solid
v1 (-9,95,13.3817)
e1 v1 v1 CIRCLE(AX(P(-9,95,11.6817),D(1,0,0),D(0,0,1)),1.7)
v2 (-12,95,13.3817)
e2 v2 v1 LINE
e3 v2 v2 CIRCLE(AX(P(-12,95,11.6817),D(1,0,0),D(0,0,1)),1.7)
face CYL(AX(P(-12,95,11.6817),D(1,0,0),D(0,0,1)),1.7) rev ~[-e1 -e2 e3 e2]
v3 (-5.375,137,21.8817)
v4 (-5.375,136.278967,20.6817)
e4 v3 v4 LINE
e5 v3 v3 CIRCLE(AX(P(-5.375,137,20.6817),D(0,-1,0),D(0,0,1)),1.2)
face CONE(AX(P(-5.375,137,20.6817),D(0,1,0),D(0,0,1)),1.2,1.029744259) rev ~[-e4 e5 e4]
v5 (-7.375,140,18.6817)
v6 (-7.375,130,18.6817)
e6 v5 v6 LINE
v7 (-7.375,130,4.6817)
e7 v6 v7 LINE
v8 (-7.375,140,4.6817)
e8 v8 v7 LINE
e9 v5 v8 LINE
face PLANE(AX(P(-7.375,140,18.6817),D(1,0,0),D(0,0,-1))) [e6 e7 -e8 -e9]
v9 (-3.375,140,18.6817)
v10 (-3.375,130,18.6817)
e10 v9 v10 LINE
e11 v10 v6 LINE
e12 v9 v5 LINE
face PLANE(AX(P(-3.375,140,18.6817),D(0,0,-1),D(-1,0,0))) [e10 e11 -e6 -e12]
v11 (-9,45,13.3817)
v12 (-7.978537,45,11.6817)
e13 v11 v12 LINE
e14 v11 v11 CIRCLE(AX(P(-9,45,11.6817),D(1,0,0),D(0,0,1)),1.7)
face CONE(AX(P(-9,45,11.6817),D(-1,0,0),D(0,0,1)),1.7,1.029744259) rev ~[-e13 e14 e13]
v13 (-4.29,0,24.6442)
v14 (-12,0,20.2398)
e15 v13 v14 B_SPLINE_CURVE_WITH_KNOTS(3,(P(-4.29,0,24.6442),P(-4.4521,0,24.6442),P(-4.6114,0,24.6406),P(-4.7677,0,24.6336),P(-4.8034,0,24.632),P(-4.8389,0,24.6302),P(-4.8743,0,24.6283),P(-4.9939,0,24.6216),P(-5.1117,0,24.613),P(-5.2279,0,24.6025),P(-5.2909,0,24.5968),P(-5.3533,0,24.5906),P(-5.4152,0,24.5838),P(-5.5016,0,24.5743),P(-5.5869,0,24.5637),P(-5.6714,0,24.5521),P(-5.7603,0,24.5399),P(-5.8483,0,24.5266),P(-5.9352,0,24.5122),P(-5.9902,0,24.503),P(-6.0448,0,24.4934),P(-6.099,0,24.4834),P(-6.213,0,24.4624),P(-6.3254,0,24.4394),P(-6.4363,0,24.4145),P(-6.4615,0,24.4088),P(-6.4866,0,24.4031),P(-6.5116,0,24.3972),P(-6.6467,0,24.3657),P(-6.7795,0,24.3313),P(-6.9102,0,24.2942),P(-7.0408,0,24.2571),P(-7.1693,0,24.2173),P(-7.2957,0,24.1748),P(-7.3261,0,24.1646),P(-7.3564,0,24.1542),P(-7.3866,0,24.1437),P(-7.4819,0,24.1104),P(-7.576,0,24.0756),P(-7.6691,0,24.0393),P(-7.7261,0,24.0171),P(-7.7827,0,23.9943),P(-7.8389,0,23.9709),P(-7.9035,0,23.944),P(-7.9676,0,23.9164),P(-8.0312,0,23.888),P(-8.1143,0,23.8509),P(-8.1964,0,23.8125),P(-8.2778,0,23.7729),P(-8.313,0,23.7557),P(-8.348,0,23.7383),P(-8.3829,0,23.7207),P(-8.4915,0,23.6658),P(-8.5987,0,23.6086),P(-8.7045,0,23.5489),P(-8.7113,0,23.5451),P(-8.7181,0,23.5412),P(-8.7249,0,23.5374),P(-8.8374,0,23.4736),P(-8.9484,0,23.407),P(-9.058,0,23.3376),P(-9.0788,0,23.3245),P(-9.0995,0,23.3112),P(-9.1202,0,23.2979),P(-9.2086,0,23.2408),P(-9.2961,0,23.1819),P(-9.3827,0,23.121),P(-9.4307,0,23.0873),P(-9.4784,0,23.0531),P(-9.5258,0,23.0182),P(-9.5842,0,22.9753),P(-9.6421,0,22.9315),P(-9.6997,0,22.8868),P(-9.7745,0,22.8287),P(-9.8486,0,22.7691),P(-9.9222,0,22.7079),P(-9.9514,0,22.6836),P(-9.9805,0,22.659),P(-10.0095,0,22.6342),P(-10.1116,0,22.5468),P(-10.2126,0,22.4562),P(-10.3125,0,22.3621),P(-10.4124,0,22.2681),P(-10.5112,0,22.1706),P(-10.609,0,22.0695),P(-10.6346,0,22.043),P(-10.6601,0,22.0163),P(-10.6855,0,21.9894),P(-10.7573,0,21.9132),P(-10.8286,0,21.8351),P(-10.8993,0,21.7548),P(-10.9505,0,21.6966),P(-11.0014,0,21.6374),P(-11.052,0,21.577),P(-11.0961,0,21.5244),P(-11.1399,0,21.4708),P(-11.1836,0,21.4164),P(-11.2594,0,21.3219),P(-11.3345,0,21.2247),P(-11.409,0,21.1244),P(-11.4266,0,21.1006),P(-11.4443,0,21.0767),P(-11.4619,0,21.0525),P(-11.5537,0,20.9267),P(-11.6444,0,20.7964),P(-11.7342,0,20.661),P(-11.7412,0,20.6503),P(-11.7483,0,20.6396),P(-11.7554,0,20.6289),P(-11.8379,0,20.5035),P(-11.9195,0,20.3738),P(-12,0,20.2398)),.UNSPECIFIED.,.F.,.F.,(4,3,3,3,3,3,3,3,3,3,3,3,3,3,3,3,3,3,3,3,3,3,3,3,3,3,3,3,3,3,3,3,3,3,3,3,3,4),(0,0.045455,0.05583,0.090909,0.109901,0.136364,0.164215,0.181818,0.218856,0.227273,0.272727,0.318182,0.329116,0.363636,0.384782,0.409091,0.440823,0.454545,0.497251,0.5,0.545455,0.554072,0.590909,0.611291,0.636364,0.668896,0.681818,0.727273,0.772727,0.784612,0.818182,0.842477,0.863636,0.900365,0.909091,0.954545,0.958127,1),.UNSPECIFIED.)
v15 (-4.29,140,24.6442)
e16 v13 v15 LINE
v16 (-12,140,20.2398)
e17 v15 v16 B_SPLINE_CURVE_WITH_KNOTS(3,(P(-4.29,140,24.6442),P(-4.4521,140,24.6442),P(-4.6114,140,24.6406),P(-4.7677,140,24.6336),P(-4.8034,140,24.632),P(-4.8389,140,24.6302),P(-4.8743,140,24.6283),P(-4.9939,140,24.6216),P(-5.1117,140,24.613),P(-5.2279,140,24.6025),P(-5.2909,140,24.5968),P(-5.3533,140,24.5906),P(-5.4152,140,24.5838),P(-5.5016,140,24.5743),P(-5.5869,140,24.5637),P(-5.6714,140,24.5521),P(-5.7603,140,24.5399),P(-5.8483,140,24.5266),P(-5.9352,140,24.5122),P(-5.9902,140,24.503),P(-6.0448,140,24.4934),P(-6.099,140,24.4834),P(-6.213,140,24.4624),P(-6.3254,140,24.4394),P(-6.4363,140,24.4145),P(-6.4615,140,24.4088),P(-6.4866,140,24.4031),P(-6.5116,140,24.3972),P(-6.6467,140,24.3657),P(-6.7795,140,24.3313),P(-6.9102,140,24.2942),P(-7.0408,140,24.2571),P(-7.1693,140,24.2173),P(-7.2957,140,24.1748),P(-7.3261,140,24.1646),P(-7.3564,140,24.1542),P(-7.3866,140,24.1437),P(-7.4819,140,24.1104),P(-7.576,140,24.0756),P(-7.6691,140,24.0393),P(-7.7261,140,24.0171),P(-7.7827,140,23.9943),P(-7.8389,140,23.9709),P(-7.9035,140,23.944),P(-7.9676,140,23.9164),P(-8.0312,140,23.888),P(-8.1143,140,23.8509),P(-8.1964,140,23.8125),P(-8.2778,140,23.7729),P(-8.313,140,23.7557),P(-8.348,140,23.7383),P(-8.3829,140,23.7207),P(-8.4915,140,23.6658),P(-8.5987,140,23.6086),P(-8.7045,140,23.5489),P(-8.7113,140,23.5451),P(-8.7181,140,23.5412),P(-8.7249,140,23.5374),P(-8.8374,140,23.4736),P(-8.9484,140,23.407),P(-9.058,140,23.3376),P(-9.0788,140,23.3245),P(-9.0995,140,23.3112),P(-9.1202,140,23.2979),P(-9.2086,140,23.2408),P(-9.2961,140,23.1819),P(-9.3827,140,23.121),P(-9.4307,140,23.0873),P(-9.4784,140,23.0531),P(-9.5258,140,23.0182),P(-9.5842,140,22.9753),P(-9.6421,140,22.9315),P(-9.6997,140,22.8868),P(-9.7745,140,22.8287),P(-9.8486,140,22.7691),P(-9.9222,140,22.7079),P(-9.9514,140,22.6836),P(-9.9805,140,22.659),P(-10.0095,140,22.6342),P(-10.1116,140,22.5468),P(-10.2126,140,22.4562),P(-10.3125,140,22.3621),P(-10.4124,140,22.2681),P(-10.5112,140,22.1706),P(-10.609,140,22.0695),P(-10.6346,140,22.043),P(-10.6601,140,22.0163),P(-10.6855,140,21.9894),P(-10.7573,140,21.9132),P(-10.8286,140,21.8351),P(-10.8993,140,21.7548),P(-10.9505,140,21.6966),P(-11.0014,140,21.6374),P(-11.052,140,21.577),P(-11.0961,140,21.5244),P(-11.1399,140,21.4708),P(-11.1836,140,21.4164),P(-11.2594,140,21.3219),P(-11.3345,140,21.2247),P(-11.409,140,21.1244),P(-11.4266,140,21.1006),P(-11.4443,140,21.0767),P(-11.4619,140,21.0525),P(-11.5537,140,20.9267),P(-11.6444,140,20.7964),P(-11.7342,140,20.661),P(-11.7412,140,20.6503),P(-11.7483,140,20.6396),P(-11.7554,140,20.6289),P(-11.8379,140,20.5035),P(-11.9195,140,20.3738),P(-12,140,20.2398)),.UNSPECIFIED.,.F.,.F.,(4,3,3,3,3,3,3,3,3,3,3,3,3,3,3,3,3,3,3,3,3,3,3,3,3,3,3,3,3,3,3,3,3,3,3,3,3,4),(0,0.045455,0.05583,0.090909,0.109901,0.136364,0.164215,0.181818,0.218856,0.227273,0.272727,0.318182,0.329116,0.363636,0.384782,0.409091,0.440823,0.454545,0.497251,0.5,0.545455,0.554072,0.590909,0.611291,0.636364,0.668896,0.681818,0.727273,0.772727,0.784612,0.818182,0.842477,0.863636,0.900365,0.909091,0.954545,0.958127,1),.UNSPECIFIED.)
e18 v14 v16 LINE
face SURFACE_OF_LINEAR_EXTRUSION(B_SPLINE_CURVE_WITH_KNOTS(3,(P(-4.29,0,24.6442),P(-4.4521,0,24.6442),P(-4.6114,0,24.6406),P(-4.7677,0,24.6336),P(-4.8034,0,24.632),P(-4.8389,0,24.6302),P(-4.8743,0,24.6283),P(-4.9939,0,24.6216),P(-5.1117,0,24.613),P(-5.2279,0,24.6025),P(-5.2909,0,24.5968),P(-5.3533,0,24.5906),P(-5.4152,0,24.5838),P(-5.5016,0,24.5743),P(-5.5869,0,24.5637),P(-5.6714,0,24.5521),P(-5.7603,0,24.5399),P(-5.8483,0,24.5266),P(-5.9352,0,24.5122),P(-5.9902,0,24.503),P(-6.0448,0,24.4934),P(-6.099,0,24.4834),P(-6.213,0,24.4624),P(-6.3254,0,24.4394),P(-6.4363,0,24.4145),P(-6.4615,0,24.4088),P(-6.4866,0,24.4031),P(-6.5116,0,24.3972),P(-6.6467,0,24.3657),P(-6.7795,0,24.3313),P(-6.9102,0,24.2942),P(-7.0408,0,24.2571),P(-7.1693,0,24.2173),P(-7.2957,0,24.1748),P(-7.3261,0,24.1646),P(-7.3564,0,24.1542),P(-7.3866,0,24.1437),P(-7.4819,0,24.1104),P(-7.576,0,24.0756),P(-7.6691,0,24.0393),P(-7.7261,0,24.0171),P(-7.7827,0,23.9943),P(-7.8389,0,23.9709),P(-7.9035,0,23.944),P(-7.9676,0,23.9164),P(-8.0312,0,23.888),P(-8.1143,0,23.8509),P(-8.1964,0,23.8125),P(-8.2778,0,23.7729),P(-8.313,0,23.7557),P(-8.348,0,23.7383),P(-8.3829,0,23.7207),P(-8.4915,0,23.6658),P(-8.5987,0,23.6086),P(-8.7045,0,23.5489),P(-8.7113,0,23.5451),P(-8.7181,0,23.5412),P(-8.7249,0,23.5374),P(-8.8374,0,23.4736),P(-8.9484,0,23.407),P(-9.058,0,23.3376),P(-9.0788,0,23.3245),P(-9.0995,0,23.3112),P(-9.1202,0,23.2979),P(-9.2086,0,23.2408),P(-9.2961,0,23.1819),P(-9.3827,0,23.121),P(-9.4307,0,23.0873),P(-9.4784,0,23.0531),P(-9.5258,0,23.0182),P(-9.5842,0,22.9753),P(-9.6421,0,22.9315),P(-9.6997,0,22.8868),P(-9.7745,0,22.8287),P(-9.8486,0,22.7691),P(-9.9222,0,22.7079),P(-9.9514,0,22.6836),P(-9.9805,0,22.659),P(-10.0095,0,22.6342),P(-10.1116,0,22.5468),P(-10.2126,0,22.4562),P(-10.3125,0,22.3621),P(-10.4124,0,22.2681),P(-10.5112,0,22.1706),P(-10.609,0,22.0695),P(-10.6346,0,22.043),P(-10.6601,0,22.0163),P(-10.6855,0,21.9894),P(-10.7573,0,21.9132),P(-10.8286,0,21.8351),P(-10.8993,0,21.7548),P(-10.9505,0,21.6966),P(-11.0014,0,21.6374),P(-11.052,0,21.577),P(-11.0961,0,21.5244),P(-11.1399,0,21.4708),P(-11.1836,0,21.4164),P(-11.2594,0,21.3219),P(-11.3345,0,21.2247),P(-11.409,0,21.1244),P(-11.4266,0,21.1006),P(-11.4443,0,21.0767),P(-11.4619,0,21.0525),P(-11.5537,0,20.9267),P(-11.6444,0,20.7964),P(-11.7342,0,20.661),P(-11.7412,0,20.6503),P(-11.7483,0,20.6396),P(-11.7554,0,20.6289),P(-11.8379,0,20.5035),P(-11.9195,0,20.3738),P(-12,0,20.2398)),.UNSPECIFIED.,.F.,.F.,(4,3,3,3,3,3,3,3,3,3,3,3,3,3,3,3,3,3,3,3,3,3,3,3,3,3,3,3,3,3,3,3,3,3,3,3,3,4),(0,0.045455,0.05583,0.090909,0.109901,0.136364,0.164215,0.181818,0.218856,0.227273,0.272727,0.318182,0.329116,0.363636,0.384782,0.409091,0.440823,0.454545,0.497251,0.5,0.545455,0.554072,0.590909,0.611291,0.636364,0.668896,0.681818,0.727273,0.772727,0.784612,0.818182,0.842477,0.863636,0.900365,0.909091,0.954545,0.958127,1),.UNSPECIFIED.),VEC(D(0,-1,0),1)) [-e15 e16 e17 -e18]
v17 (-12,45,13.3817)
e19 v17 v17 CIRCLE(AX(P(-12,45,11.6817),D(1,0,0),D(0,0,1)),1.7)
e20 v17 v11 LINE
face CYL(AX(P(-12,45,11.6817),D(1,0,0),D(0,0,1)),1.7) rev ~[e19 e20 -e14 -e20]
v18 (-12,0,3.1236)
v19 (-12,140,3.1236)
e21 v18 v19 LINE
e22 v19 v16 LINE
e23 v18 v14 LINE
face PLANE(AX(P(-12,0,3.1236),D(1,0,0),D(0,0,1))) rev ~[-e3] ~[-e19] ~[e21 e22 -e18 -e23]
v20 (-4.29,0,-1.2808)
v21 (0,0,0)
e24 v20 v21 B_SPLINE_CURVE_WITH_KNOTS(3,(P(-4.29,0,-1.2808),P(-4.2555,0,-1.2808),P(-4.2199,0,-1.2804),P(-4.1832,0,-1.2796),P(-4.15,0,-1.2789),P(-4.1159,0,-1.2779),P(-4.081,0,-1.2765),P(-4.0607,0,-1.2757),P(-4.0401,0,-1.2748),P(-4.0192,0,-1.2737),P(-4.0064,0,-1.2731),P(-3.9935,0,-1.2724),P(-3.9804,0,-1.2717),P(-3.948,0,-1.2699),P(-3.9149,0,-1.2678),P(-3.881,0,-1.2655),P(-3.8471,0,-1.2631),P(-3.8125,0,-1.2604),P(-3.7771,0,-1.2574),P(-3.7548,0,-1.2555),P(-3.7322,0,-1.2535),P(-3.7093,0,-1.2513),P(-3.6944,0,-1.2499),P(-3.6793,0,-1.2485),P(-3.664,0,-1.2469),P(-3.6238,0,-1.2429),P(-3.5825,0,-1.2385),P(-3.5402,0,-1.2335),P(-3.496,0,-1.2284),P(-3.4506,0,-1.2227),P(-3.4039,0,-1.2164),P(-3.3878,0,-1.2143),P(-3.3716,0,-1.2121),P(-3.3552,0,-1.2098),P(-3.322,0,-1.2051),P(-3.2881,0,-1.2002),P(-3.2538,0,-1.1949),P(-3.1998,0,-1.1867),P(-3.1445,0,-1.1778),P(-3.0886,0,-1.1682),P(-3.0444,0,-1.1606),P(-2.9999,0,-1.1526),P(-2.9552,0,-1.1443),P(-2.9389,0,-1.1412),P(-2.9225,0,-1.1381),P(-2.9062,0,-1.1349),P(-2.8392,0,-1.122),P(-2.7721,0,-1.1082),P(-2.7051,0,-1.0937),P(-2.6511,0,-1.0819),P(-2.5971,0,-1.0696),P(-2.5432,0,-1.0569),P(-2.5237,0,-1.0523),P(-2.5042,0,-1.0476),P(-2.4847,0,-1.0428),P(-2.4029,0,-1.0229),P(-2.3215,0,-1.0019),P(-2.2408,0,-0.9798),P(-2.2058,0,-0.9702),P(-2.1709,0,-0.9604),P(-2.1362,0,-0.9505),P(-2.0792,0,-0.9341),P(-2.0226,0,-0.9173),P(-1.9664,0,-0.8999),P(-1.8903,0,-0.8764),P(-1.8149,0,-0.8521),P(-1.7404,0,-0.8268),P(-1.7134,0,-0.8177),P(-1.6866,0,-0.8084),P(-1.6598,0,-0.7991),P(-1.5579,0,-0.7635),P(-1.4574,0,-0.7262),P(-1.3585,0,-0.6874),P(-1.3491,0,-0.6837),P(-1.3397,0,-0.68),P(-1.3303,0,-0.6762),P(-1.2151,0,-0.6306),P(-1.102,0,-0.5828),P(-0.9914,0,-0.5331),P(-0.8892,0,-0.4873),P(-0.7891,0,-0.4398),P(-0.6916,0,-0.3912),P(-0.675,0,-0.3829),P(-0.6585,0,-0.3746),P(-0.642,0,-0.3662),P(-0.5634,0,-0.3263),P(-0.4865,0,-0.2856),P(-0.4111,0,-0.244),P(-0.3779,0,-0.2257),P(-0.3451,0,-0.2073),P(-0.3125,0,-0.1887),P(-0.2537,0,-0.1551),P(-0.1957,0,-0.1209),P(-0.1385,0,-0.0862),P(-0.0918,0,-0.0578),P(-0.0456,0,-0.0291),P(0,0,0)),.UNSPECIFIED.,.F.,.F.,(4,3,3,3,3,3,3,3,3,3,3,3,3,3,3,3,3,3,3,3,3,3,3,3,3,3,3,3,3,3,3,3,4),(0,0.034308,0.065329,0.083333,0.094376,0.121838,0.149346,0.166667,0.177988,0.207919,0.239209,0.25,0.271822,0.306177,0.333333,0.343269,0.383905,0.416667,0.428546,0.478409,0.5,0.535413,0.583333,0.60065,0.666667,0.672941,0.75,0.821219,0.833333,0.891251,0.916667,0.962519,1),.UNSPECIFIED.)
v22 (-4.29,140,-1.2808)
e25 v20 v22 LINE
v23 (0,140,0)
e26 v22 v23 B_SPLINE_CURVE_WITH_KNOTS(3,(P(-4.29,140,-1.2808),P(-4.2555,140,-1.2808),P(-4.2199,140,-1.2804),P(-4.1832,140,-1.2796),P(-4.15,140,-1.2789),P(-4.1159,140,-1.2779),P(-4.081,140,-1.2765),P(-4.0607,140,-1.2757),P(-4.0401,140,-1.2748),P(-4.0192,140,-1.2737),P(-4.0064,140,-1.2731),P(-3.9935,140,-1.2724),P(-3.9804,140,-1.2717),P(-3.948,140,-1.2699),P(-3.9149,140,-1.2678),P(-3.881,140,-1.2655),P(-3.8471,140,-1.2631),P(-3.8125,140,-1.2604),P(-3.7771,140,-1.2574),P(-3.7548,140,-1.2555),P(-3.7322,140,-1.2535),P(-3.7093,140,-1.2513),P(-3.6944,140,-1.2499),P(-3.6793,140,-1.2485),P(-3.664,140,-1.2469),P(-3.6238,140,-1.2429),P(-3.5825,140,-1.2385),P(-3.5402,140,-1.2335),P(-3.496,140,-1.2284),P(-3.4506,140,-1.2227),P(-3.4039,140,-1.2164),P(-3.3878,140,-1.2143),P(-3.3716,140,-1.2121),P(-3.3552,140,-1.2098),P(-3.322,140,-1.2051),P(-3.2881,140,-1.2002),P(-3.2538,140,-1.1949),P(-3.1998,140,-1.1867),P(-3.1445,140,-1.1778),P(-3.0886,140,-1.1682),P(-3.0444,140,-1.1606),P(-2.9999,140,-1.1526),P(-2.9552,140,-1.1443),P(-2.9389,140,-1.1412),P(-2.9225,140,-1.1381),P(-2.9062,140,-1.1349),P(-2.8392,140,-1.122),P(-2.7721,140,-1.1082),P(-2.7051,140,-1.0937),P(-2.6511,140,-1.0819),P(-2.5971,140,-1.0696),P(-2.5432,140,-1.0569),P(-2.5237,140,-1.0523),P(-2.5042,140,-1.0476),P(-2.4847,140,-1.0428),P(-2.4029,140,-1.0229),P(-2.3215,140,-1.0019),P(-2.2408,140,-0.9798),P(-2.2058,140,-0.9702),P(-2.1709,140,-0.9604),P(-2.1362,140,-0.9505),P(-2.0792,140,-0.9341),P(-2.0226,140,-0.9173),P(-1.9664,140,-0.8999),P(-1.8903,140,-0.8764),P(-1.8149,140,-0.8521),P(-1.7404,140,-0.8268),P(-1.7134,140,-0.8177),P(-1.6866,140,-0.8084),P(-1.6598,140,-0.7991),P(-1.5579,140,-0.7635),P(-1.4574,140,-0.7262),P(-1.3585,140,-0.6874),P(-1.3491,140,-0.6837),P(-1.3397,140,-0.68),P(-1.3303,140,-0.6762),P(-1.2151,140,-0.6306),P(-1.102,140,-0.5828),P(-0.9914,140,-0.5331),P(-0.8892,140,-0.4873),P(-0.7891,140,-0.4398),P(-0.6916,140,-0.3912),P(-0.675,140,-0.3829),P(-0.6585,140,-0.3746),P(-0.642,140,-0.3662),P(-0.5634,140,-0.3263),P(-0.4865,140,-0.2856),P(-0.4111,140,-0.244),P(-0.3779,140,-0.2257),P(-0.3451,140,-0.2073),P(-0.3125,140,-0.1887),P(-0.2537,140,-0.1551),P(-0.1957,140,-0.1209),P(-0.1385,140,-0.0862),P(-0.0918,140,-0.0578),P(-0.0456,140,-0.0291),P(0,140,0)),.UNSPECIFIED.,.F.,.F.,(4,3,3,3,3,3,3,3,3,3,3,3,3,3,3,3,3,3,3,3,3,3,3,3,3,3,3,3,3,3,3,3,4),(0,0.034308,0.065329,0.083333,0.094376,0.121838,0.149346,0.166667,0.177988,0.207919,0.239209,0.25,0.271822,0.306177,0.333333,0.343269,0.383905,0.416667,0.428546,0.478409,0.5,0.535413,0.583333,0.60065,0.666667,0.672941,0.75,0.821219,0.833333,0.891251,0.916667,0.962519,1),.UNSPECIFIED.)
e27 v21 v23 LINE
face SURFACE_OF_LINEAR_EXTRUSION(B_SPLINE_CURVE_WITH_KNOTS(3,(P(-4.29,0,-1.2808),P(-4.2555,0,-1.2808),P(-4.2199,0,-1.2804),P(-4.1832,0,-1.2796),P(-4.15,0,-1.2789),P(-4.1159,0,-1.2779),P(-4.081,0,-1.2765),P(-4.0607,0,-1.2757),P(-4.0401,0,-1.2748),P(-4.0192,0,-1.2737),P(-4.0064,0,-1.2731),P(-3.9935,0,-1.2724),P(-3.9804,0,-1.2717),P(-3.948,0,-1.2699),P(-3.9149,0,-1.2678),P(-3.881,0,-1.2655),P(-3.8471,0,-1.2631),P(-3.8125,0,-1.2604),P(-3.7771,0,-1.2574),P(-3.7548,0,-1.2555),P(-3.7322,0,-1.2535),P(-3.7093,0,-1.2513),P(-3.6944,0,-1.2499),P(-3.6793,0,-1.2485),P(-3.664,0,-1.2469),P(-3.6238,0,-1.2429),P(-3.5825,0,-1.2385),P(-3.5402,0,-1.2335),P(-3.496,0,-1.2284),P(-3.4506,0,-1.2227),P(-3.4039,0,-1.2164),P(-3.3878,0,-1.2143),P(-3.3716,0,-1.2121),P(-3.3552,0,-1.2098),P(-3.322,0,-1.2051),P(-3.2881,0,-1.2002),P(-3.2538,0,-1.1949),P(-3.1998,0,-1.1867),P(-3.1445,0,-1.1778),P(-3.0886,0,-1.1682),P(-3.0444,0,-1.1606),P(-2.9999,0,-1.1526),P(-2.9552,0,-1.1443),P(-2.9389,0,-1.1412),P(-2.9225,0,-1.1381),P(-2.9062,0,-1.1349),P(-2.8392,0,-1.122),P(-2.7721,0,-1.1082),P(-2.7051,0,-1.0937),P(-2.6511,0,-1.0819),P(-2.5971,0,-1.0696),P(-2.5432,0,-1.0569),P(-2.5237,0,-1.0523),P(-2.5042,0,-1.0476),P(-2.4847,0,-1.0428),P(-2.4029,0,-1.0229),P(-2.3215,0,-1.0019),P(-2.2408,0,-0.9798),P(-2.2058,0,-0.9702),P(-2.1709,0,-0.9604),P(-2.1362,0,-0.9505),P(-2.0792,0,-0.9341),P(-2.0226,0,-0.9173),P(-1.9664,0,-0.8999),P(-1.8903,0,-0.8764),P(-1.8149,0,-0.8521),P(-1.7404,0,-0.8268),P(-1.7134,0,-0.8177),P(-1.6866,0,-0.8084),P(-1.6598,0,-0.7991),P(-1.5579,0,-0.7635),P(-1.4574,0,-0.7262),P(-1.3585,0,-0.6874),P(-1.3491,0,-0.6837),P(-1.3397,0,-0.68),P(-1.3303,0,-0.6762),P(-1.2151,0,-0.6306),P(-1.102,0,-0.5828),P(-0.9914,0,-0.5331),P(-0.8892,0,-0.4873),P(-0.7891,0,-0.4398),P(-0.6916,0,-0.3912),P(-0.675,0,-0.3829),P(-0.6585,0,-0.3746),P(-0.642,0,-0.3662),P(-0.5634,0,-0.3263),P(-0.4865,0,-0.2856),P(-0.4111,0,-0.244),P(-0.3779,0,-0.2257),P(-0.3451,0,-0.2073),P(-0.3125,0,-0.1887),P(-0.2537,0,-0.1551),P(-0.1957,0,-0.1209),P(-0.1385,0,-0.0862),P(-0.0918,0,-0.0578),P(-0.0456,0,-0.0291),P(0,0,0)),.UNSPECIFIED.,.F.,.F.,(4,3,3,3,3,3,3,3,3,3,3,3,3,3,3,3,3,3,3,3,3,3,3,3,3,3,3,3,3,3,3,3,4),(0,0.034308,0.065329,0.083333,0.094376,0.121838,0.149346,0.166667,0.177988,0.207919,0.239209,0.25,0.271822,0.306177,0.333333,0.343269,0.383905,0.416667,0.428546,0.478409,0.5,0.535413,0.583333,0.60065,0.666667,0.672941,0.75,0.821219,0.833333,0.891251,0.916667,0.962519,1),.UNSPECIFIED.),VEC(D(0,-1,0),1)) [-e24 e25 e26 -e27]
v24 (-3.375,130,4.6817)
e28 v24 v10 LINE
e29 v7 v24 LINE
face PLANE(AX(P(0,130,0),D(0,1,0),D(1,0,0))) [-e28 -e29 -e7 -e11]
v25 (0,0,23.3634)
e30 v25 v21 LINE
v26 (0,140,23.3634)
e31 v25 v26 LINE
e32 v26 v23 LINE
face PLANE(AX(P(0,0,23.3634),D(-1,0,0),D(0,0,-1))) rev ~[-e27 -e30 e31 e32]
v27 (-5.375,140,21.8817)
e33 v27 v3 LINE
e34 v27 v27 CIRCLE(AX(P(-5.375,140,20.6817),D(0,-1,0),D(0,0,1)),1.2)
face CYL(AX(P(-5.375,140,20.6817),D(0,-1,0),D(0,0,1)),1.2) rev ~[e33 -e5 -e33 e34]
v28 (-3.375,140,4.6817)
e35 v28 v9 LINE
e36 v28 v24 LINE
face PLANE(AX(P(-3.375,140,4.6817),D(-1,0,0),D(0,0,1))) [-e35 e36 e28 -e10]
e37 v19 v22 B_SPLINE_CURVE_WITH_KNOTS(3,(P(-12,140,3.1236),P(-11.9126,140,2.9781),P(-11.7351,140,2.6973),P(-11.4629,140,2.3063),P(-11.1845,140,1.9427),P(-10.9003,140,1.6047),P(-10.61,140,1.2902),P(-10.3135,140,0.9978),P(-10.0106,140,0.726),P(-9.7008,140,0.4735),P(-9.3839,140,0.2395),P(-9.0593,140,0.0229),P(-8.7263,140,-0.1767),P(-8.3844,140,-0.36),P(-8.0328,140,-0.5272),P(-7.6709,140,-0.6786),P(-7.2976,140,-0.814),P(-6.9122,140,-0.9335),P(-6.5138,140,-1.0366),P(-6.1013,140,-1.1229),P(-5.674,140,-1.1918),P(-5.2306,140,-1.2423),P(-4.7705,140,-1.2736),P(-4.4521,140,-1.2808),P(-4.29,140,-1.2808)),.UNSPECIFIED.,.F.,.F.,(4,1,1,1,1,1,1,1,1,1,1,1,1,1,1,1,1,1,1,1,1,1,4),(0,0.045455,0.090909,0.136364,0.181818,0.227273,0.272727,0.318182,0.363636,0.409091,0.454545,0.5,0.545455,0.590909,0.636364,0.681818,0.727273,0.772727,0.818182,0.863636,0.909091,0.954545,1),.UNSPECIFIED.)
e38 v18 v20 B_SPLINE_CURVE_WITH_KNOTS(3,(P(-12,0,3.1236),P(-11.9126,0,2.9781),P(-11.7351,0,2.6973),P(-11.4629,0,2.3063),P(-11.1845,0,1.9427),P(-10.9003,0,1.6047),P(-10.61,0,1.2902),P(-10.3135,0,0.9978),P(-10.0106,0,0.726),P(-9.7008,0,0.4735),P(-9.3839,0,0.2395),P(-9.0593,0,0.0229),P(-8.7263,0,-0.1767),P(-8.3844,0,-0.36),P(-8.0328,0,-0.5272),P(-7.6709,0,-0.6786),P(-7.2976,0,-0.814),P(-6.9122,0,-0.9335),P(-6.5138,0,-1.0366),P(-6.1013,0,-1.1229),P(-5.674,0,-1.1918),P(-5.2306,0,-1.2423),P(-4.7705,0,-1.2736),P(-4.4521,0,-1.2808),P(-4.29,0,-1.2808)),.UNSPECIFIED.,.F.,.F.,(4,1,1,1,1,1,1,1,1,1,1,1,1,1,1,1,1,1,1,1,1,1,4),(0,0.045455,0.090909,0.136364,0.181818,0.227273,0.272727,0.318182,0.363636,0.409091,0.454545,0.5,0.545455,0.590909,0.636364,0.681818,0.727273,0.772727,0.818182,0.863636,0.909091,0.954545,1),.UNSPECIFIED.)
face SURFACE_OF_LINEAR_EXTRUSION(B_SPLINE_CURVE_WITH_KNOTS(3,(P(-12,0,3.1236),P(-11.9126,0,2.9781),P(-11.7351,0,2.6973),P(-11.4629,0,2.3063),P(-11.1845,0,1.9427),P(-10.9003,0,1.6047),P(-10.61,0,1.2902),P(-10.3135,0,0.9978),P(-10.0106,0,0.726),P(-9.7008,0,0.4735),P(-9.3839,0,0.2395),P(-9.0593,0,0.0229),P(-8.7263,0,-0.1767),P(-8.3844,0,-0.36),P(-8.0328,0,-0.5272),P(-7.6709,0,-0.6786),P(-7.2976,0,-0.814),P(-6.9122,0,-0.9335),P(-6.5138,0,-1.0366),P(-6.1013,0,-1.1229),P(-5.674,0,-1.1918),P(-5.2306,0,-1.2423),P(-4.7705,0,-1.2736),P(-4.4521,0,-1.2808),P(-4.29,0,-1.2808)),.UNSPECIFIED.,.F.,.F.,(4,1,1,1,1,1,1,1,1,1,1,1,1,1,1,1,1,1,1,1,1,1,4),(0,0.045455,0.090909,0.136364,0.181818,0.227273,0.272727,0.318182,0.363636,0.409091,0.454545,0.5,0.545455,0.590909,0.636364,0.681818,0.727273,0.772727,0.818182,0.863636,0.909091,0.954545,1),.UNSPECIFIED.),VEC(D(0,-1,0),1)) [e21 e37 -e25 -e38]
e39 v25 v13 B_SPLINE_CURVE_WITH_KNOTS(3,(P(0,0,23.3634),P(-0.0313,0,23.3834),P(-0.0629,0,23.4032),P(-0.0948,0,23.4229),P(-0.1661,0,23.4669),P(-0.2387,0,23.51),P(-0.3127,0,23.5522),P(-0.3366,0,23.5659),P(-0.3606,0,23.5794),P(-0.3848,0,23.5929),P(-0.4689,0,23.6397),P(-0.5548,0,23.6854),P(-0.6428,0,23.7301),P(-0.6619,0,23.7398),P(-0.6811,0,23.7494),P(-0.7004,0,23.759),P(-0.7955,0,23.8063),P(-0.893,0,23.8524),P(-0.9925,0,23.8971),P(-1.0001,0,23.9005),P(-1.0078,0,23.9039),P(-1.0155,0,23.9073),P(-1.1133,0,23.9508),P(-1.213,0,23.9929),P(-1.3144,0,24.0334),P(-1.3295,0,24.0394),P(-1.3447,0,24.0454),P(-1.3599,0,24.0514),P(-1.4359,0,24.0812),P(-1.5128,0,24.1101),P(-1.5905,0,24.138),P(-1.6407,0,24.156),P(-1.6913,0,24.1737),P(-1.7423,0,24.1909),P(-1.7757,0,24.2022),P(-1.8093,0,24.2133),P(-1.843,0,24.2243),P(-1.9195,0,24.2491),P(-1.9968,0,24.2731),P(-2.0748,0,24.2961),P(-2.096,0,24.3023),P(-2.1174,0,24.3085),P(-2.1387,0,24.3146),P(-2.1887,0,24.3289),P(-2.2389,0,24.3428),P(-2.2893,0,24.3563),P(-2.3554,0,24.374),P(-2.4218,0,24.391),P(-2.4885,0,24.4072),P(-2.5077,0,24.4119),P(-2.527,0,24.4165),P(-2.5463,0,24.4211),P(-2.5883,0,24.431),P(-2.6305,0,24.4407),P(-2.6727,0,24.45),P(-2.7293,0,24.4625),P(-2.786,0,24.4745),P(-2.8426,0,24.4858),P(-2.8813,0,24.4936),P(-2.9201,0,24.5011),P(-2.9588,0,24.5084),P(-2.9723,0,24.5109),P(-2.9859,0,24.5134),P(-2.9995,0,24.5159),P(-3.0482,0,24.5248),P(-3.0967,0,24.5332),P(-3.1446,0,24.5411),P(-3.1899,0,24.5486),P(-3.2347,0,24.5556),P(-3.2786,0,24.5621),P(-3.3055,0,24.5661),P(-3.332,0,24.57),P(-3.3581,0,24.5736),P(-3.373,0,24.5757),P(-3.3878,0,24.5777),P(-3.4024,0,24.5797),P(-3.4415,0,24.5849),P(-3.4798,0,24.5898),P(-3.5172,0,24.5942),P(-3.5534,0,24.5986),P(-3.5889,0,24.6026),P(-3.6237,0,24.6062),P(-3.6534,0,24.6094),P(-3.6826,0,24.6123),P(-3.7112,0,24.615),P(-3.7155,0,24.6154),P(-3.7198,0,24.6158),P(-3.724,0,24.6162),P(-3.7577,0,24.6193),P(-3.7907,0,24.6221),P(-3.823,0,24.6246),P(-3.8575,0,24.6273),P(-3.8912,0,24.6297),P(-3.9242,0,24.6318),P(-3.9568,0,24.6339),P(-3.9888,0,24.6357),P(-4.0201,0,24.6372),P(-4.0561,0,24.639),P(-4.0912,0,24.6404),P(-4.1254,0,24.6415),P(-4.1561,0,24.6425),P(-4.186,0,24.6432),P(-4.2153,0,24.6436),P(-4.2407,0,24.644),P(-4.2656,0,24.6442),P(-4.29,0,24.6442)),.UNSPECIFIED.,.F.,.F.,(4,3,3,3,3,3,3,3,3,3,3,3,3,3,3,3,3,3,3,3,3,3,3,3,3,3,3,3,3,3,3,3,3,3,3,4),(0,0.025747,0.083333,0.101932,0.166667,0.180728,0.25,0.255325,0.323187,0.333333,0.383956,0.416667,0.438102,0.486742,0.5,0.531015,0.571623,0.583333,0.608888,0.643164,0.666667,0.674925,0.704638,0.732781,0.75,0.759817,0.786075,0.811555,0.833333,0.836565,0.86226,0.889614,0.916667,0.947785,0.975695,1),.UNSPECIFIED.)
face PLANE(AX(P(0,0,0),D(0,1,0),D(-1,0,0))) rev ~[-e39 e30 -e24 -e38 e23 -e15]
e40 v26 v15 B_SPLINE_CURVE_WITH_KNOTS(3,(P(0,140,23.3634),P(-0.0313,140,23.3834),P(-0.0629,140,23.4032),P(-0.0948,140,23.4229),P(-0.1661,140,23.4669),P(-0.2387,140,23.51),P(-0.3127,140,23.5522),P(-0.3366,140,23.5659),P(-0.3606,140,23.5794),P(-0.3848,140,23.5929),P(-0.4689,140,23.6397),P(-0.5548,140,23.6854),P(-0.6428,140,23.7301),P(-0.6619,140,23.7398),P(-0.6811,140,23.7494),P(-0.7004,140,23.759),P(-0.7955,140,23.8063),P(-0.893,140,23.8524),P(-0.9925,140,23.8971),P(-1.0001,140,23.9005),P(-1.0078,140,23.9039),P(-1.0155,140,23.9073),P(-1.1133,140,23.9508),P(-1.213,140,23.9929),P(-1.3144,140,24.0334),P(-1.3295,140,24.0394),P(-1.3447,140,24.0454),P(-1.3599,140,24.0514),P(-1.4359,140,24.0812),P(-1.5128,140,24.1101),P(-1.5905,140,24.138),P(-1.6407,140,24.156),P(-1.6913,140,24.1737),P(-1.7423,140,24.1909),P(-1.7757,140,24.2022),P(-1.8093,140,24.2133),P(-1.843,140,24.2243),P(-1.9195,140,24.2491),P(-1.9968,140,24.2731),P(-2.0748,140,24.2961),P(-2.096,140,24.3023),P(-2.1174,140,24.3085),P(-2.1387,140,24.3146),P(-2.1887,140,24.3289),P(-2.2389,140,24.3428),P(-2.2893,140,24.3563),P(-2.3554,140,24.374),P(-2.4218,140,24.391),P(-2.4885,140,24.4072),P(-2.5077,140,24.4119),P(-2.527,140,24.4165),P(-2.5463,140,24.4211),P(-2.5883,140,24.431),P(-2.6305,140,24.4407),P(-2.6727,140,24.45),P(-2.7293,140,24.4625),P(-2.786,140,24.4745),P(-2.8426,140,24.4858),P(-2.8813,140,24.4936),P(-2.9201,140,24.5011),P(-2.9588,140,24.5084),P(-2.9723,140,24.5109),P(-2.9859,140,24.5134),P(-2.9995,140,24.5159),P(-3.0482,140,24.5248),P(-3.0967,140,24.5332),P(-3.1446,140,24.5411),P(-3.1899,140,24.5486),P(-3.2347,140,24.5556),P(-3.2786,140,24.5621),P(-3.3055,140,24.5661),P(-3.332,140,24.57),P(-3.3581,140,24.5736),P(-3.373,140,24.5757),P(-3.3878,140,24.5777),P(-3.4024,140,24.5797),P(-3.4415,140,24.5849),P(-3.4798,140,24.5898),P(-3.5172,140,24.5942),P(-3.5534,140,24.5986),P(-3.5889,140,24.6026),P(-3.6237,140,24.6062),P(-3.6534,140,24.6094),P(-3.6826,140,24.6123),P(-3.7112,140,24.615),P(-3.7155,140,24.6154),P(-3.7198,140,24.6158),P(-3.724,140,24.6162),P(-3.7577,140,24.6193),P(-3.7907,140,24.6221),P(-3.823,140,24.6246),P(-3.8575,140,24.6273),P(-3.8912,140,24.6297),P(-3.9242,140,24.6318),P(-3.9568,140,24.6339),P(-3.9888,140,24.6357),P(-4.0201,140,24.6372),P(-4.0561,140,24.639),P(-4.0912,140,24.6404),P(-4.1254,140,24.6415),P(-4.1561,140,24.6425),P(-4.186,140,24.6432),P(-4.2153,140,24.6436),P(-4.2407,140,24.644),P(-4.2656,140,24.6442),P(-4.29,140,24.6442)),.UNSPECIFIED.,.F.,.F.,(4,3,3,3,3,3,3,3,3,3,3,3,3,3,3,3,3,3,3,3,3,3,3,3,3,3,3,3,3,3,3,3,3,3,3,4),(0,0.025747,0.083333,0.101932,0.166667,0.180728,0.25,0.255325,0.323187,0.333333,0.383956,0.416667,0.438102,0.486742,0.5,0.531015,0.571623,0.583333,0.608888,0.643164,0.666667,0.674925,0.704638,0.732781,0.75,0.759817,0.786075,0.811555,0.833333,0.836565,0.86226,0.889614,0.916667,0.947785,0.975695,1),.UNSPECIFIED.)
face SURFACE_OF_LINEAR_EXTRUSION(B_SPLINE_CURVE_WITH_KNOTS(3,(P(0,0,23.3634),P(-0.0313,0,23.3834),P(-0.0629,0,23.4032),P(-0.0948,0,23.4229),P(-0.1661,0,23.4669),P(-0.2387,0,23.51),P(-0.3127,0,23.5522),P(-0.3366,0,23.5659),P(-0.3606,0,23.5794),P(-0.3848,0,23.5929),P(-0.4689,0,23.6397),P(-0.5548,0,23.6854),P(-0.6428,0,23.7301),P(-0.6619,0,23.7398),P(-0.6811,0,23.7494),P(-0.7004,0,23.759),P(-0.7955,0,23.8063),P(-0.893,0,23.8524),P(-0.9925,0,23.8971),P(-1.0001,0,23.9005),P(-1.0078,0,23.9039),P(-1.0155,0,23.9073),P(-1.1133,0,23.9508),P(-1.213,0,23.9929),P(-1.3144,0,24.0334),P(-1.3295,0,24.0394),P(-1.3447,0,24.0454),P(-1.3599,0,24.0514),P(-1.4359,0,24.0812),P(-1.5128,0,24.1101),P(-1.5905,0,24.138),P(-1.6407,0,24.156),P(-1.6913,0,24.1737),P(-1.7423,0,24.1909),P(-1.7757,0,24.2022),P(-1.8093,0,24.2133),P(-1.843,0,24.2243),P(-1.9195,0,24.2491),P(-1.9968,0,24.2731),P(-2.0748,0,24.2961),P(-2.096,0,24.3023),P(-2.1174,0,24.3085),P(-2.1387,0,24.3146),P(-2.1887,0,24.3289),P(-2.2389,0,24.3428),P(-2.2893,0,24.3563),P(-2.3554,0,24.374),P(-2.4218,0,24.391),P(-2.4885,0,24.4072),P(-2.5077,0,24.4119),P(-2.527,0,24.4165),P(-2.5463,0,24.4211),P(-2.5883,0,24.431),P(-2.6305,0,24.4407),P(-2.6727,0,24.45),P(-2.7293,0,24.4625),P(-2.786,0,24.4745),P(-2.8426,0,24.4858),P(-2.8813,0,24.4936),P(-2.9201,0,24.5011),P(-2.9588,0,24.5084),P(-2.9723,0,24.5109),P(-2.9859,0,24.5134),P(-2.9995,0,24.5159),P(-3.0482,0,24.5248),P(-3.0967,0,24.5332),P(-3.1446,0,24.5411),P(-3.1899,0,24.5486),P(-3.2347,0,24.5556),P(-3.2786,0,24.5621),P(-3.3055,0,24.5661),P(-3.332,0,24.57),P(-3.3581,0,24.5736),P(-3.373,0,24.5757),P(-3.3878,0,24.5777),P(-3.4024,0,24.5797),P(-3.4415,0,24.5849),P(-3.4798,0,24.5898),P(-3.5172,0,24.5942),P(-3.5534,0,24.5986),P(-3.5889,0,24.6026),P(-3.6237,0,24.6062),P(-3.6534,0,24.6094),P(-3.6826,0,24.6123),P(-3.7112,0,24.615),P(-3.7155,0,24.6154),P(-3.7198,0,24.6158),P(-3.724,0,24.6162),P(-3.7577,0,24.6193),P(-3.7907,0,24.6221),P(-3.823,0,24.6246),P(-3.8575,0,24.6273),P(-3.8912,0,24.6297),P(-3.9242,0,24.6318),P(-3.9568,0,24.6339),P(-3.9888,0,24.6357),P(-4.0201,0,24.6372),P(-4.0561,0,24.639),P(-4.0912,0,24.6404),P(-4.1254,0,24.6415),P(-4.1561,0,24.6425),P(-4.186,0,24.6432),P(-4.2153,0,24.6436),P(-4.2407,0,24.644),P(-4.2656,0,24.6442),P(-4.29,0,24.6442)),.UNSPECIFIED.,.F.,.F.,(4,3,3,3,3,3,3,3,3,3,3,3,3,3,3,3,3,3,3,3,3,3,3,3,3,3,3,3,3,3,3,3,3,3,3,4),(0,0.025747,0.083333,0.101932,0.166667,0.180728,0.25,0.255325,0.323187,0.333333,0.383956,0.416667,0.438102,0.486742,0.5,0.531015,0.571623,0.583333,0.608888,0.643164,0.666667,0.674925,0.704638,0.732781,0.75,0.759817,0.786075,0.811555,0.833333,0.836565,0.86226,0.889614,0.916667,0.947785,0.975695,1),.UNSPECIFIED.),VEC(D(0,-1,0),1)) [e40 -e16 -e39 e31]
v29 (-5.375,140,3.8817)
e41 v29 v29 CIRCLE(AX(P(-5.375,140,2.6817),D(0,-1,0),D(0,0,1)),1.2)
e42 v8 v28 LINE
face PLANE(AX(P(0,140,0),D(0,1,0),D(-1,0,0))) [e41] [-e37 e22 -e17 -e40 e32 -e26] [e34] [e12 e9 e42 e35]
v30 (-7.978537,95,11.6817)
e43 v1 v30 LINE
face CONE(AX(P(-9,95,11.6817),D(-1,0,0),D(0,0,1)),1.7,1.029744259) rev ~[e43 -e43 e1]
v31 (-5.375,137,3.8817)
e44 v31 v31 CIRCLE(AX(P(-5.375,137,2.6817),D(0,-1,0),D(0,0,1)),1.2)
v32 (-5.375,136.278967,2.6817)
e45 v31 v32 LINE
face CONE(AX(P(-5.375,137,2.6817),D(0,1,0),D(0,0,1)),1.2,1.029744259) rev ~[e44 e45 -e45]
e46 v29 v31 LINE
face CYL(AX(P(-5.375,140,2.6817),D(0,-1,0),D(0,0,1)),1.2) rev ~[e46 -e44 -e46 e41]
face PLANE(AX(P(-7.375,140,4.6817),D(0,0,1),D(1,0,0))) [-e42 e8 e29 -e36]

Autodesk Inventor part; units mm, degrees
ref_plane "YZ Plane" through (0, 0, 0) normal (1, 0, 0) x (0, 1, 0)
ref_plane "XZ Plane" through (0, 0, 0) normal (0, 1, 0) x (-1, 0, 0)
ref_plane "XY Plane" through (0, 0, 0) normal (0, 0, 1) x (1, 0, 0)
sketch "Szkic1" plane through (0, 0, 0) normal (0, 1, 0) x (-1, 0, 0)
  spline S0 degree 3 poles (4.29, 24.6442) (4.4521, 24.6442) (4.6114, 24.6406) (4.7677, 24.6336) (4.8034, 24.632) (4.8389, 24.6302) (4.8743, 24.6283) (4.9939, 24.6216) (5.1117, 24.613) (5.2279, 24.6025) (5.2909, 24.5968) (5.3533, 24.5906) (5.4152, 24.5838) (5.5016, 24.5743) (5.5869, 24.5637) (5.6714, 24.5521) (5.7603, 24.5399) (5.8483, 24.5266) (5.9352, 24.5122) (5.9902, 24.503) (6.0448, 24.4934) (6.099, 24.4834) (6.213, 24.4624) (6.3254, 24.4394) (6.4363, 24.4145) (6.4615, 24.4088) (6.4866, 24.4031) (6.5116, 24.3972) (6.6467, 24.3657) (6.7795, 24.3313) (6.9102, 24.2942) (7.0408, 24.2571) (7.1693, 24.2173) (7.2957, 24.1748) (7.3261, 24.1646) (7.3564, 24.1542) (7.3866, 24.1437) (7.4819, 24.1104) (7.576, 24.0756) (7.6691, 24.0393) (7.7261, 24.0171) (7.7827, 23.9943) (7.8389, 23.9709) (7.9035, 23.944) (7.9676, 23.9164) (8.0312, 23.888) (8.1143, 23.8509) (8.1964, 23.8125) (8.2778, 23.7729) (8.313, 23.7557) (8.348, 23.7383) (8.3829, 23.7207) (8.4915, 23.6658) (8.5987, 23.6086) (8.7045, 23.5489) (8.7113, 23.5451) (8.7181, 23.5412) (8.7249, 23.5374) (8.8374, 23.4736) (8.9484, 23.407) (9.058, 23.3376) (9.0788, 23.3245) (9.0995, 23.3112) (9.1202, 23.2979) (9.2086, 23.2408) (9.2961, 23.1819) (9.3827, 23.121) (9.4307, 23.0873) (9.4784, 23.0531) (9.5258, 23.0182) (9.5842, 22.9753) (9.6421, 22.9315) (9.6997, 22.8868) (9.7745, 22.8287) (9.8486, 22.7691) (9.9222, 22.7079) (9.9514, 22.6836) (9.9805, 22.659) (10.0095, 22.6342) (10.1116, 22.5468) (10.2126, 22.4562) (10.3125, 22.3621) (10.4124, 22.2681) (10.5112, 22.1706) (10.609, 22.0695) (10.6346, 22.043) (10.6601, 22.0163) (10.6855, 21.9894) (10.7573, 21.9132) (10.8286, 21.8351) (10.8993, 21.7548) (10.9505, 21.6966) (11.0014, 21.6374) (11.052, 21.577) (11.0961, 21.5244) (11.1399, 21.4708) (11.1836, 21.4164) (11.2594, 21.3219) (11.3345, 21.2247) (11.409, 21.1244) (11.4266, 21.1006) (11.4443, 21.0767) (11.4619, 21.0525) (11.5537, 20.9267) (11.6444, 20.7964) (11.7342, 20.661) (11.7412, 20.6503) (11.7483, 20.6396) (11.7554, 20.6289) (11.8379, 20.5035) (11.9195, 20.3738) (12, 20.2398) knots 0 0 0 0 0.045455 0.045455 0.045455 0.05583 0.05583 0.05583 0.090909 0.090909 0.090909 0.109901 0.109901 0.109901 0.136364 0.136364 0.136364 0.164215 0.164215 0.164215 0.181818 0.181818 0.181818 0.218856 0.218856 0.218856 0.227273 0.227273 0.227273 0.272727 0.272727 0.272727 0.318182 0.318182 0.318182 0.329116 0.329116 0.329116 0.363636 0.363636 0.363636 0.384782 0.384782 0.384782 0.409091 0.409091 0.409091 0.440823 0.440823 0.440823 0.454545 0.454545 0.454545 0.497251 0.497251 0.497251 0.5 0.5 0.5 0.545455 0.545455 0.545455 0.554072 0.554072 0.554072 0.590909 0.590909 0.590909 0.611291 0.611291 0.611291 0.636364 0.636364 0.636364 0.668896 0.668896 0.668896 0.681818 0.681818 0.681818 0.727273 0.727273 0.727273 0.772727 0.772727 0.772727 0.784612 0.784612 0.784612 0.818182 0.818182 0.818182 0.842477 0.842477 0.842477 0.863636 0.863636 0.863636 0.900365 0.900365 0.900365 0.909091 0.909091 0.909091 0.954545 0.954545 0.954545 0.958127 0.958127 0.958127 1 1 1 1
  spline S1 degree 3 poles (0, 23.3634) (0.0313, 23.3834) (0.0629, 23.4032) (0.0948, 23.4229) (0.1661, 23.4669) (0.2387, 23.51) (0.3127, 23.5522) (0.3366, 23.5659) (0.3606, 23.5794) (0.3848, 23.5929) (0.4689, 23.6397) (0.5548, 23.6854) (0.6428, 23.7301) (0.6619, 23.7398) (0.6811, 23.7494) (0.7004, 23.759) (0.7955, 23.8063) (0.893, 23.8524) (0.9925, 23.8971) (1.0001, 23.9005) (1.0078, 23.9039) (1.0155, 23.9073) (1.1133, 23.9508) (1.213, 23.9929) (1.3144, 24.0334) (1.3295, 24.0394) (1.3447, 24.0454) (1.3599, 24.0514) (1.4359, 24.0812) (1.5128, 24.1101) (1.5905, 24.138) (1.6407, 24.156) (1.6913, 24.1737) (1.7423, 24.1909) (1.7757, 24.2022) (1.8093, 24.2133) (1.843, 24.2243) (1.9195, 24.2491) (1.9968, 24.2731) (2.0748, 24.2961) (2.096, 24.3023) (2.1174, 24.3085) (2.1387, 24.3146) (2.1887, 24.3289) (2.2389, 24.3428) (2.2893, 24.3563) (2.3554, 24.374) (2.4218, 24.391) (2.4885, 24.4072) (2.5077, 24.4119) (2.527, 24.4165) (2.5463, 24.4211) (2.5883, 24.431) (2.6305, 24.4407) (2.6727, 24.45) (2.7293, 24.4625) (2.786, 24.4745) (2.8426, 24.4858) (2.8813, 24.4936) (2.9201, 24.5011) (2.9588, 24.5084) (2.9723, 24.5109) (2.9859, 24.5134) (2.9995, 24.5159) (3.0482, 24.5248) (3.0967, 24.5332) (3.1446, 24.5411) (3.1899, 24.5486) (3.2347, 24.5556) (3.2786, 24.5621) (3.3055, 24.5661) (3.332, 24.57) (3.3581, 24.5736) (3.373, 24.5757) (3.3878, 24.5777) (3.4024, 24.5797) (3.4415, 24.5849) (3.4798, 24.5898) (3.5172, 24.5942) (3.5534, 24.5986) (3.5889, 24.6026) (3.6237, 24.6062) (3.6534, 24.6094) (3.6826, 24.6123) (3.7112, 24.615) (3.7155, 24.6154) (3.7198, 24.6158) (3.724, 24.6162) (3.7577, 24.6193) (3.7907, 24.6221) (3.823, 24.6246) (3.8575, 24.6273) (3.8912, 24.6297) (3.9242, 24.6318) (3.9568, 24.6339) (3.9888, 24.6357) (4.0201, 24.6372) (4.0561, 24.639) (4.0912, 24.6404) (4.1254, 24.6415) (4.1561, 24.6425) (4.186, 24.6432) (4.2153, 24.6436) (4.2407, 24.644) (4.2656, 24.6442) (4.29, 24.6442) knots 0 0 0 0 0.025747 0.025747 0.025747 0.083333 0.083333 0.083333 0.101932 0.101932 0.101932 0.166667 0.166667 0.166667 0.180728 0.180728 0.180728 0.25 0.25 0.25 0.255325 0.255325 0.255325 0.323187 0.323187 0.323187 0.333333 0.333333 0.333333 0.383956 0.383956 0.383956 0.416667 0.416667 0.416667 0.438102 0.438102 0.438102 0.486742 0.486742 0.486742 0.5 0.5 0.5 0.531015 0.531015 0.531015 0.571623 0.571623 0.571623 0.583333 0.583333 0.583333 0.608888 0.608888 0.608888 0.643164 0.643164 0.643164 0.666667 0.666667 0.666667 0.674925 0.674925 0.674925 0.704638 0.704638 0.704638 0.732781 0.732781 0.732781 0.75 0.75 0.75 0.759817 0.759817 0.759817 0.786075 0.786075 0.786075 0.811555 0.811555 0.811555 0.833333 0.833333 0.833333 0.836565 0.836565 0.836565 0.86226 0.86226 0.86226 0.889614 0.889614 0.889614 0.916667 0.916667 0.916667 0.947785 0.947785 0.947785 0.975695 0.975695 0.975695 1 1 1 1
  line L0 (0, 23.3634) -> (0, 0)
  spline S2 degree 3 poles (4.29, -1.2808) (4.2555, -1.2808) (4.2199, -1.2804) (4.1832, -1.2796) (4.15, -1.2789) (4.1159, -1.2779) (4.081, -1.2765) (4.0607, -1.2757) (4.0401, -1.2748) (4.0192, -1.2737) (4.0064, -1.2731) (3.9935, -1.2724) (3.9804, -1.2717) (3.948, -1.2699) (3.9149, -1.2678) (3.881, -1.2655) (3.8471, -1.2631) (3.8125, -1.2604) (3.7771, -1.2574) (3.7548, -1.2555) (3.7322, -1.2535) (3.7093, -1.2513) (3.6944, -1.2499) (3.6793, -1.2485) (3.664, -1.2469) (3.6238, -1.2429) (3.5825, -1.2385) (3.5402, -1.2335) (3.496, -1.2284) (3.4506, -1.2227) (3.4039, -1.2164) (3.3878, -1.2143) (3.3716, -1.2121) (3.3552, -1.2098) (3.322, -1.2051) (3.2881, -1.2002) (3.2538, -1.1949) (3.1998, -1.1867) (3.1445, -1.1778) (3.0886, -1.1682) (3.0444, -1.1606) (2.9999, -1.1526) (2.9552, -1.1443) (2.9389, -1.1412) (2.9225, -1.1381) (2.9062, -1.1349) (2.8392, -1.122) (2.7721, -1.1082) (2.7051, -1.0937) (2.6511, -1.0819) (2.5971, -1.0696) (2.5432, -1.0569) (2.5237, -1.0523) (2.5042, -1.0476) (2.4847, -1.0428) (2.4029, -1.0229) (2.3215, -1.0019) (2.2408, -0.9798) (2.2058, -0.9702) (2.1709, -0.9604) (2.1362, -0.9505) (2.0792, -0.9341) (2.0226, -0.9173) (1.9664, -0.8999) (1.8903, -0.8764) (1.8149, -0.8521) (1.7404, -0.8268) (1.7134, -0.8177) (1.6866, -0.8084) (1.6598, -0.7991) (1.5579, -0.7635) (1.4574, -0.7262) (1.3585, -0.6874) (1.3491, -0.6837) (1.3397, -0.68) (1.3303, -0.6762) (1.2151, -0.6306) (1.102, -0.5828) (0.9914, -0.5331) (0.8892, -0.4873) (0.7891, -0.4398) (0.6916, -0.3912) (0.675, -0.3829) (0.6585, -0.3746) (0.642, -0.3662) (0.5634, -0.3263) (0.4865, -0.2856) (0.4111, -0.244) (0.3779, -0.2257) (0.3451, -0.2073) (0.3125, -0.1887) (0.2537, -0.1551) (0.1957, -0.1209) (0.1385, -0.0862) (0.0918, -0.0578) (0.0456, -0.0291) (0, 0) knots 0 0 0 0 0.034308 0.034308 0.034308 0.065329 0.065329 0.065329 0.083333 0.083333 0.083333 0.094376 0.094376 0.094376 0.121838 0.121838 0.121838 0.149346 0.149346 0.149346 0.166667 0.166667 0.166667 0.177988 0.177988 0.177988 0.207919 0.207919 0.207919 0.239209 0.239209 0.239209 0.25 0.25 0.25 0.271822 0.271822 0.271822 0.306177 0.306177 0.306177 0.333333 0.333333 0.333333 0.343269 0.343269 0.343269 0.383905 0.383905 0.383905 0.416667 0.416667 0.416667 0.428546 0.428546 0.428546 0.478409 0.478409 0.478409 0.5 0.5 0.5 0.535413 0.535413 0.535413 0.583333 0.583333 0.583333 0.60065 0.60065 0.60065 0.666667 0.666667 0.666667 0.672941 0.672941 0.672941 0.75 0.75 0.75 0.821219 0.821219 0.821219 0.833333 0.833333 0.833333 0.891251 0.891251 0.891251 0.916667 0.916667 0.916667 0.962519 0.962519 0.962519 1 1 1 1
  spline S3 degree 3 poles (12, 3.1236) (11.9126, 2.9781) (11.7351, 2.6973) (11.4629, 2.3063) (11.1845, 1.9427) (10.9003, 1.6047) (10.61, 1.2902) (10.3135, 0.9978) (10.0106, 0.726) (9.7008, 0.4735) (9.3839, 0.2395) (9.0593, 0.0229) (8.7263, -0.1767) (8.3844, -0.36) (8.0328, -0.5272) (7.6709, -0.6786) (7.2976, -0.814) (6.9122, -0.9335) (6.5138, -1.0366) (6.1013, -1.1229) (5.674, -1.1918) (5.2306, -1.2423) (4.7705, -1.2736) (4.4521, -1.2808) (4.29, -1.2808) knots 0 0 0 0 0.045455 0.090909 0.136364 0.181818 0.227273 0.272727 0.318182 0.363636 0.409091 0.454545 0.5 0.545455 0.590909 0.636364 0.681818 0.727273 0.772727 0.818182 0.863636 0.909091 0.954545 1 1 1 1
  line L1 (12, 3.1236) -> (12, 20.2398)
  line L2 (15, 21.0088) -> (15, 2.3547)
  line L3 (-3, 24.8488) -> (-3, 21.962) construction
  line L4 (12.5, 20.3765) -> (12.5, 2.9869)
  line L5 (-0.5, 23.6324) -> (-0.5, -0.269)
  arc A0 (4.29, -1.7808) -> (12.5, 2.9869) centre (4.2141, 7.8027) ccw
  arc A1 (-0.5, -0.269) -> (4.29, -1.7808) centre (4.3945, 6.8946) ccw
  line L6 (0, 0) -> (-0.2687, -0.4216) construction
  line L7 (12, 3.1236) -> (12.4286, 2.8661) construction
  arc A2 (12.5, 20.3765) -> (4.29, 25.1442) centre (4.2141, 15.5608) ccw
  arc A3 (4.29, 25.1442) -> (-0.5, 23.6324) centre (4.3943, 16.4696) ccw
  line L8 (12, 20.2398) -> (12.4286, 20.4974) construction
  line L9 (0, 23.3634) -> (-0.2688, 23.7851) construction
  arc A4 (4.29, -4.2808) -> (15, 2.3547) centre (4.2142, 7.8026) ccw
  arc A5 (-3, -1.4854) -> (4.29, -4.2808) centre (4.394, 6.894) ccw
  arc A6 (15, 21.0088) -> (4.29, 27.6442) centre (4.2142, 15.5608) ccw
  arc A7 (4.29, 27.6442) -> (-3, 24.8488) centre (4.3938, 16.4703) ccw
  line L10 (12.4286, 2.8661) -> (14.5714, 1.5783) construction
  line L11 (12.5, 20.3765) -> (14.6615, 21.6328) construction
  line L12 (-0.5, 23.6324) -> (-1.9104, 25.6966) construction
  line L13 (-0.5, -0.269) -> (-1.9103, -2.3332) construction
  line L14 (-0.5, 3.731) -> (-3, 3.731)
  line L15 (-0.5, 19.6324) -> (-3, 19.6324)
  line L16 (-3, 24.8488) -> (-8, 27.7355)
  line L17 (-8, 27.7355) -> (-8, 24.8488)
  line L18 (-8, 24.8488) -> (-3, 21.962)
  line L19 (-3, 21.962) -> (-3, 24.8488)
  line L20 (-3, 21.962) -> (-3, -1.4854)
  line L21 (-3, -1.4854) -> (-8, -4.3722)
  line L22 (-8, -4.3722) -> (-8, -1.4854)
  line L23 (-8, -1.4854) -> (-3, 1.4013)
  line L24 (-3, 1.4013) -> (-3, -1.4854)
  line L25 (-5.5, 26.2922) -> (-6.75, 24.1271) construction
  line L26 (-5.1651, -2.7354) -> (-6.4151, -0.5703) construction
  line L27 (-8, 24.8488) -> (-8, -1.4854)
  line L28 (15.5, 36.6817) -> (12.5, 36.6817)
  line L29 (12.5, 36.6817) -> (12.5, 24.3562)
  line L30 (12.5, -13.3183) -> (15.5, -13.3183)
  line L31 (15.5, -13.3183) -> (15.5, 36.6817)
  line L32 (12.5, 24.3562) -> (12.5, 20.3765)
  line L33 (12.5, 20.3765) -> (12.5, 2.8231)
  line L34 (12.5, -0.9928) -> (12.5, -13.3183)
  line L35 (12.5, 2.8231) -> (12.5, -0.9928)
  point P0 (0, 0)
  point P1 (0, 0)
  point P2 (0, 11.6817)
  dimension "d0" = 0.5
  dimension "d1" = 0.5
  dimension "d2" = 0.5
  dimension "d3" = 0.5
  dimension "d4" = 0.5
  dimension "d5" = 0.5
  dimension "d6" = 0.5
  dimension "d7" = 0.5
  dimension "d8" = 2.5
  dimension "d9" = 2.5
  dimension "d10" = 2.5
  dimension "d11" = 2.5
  dimension "d12" = 2.5
  dimension "d13" = 2.5
  dimension "d14" = 2.5
  dimension "d15" = 2.5
  dimension "d16" = 4
  dimension "d17" = 4
  dimension "d18" = 120
  dimension "d19" = 5
  dimension "d20" = 120
  dimension "d21" = 2.5
  dimension "d22" = 2.5
  dimension "d23" = 5
  dimension "d24" = 50
  dimension "d25" = 25
  dimension "d26" = 3
extrude "Wyciągnięcie proste1" add sketch "Szkic1" along normal blind 140 contours S0 L1 S3 S2 L0 S1
sketch "Szkic2" plane through (-12, 0, 3.1236) normal (-1, 0, 0) x (0, 0, 1)
  line L0 (0, 140) -> (17.1162, 140) projected
  line L1 (17.1162, 0) -> (17.1162, 140) projected
  line L2 (0, 0) -> (0, 140) projected
  point P0 (-3.1236, 0)
  point P1 (8.5581, 45)
  point P2 (8.5581, 70)
  point P3 (8.5581, 95)
  dimension "d32" = 50
  dimension "d33" = 25
  dimension "d34" = 70
  dimension "d62" = 17.1162
  dimension "d63" = 8.5581
hole "Otwór1" at (-12, 45, 11.6817) at (-12, 95, 11.6817) direction (1, 0, 0) diameter 3.4 depth 3 tip angle 118 clearance for "Śruba ze łbem płaskim obrobiona" size "M3" standard "ANSI Profil metryczny M"
sketch "Szkic3" plane through (0, 140, 0) normal (0, 1, 0) x (1, 0, 0)
  line L0 (0, -23.3634) -> (0, 0) projected
  line L1 (0, -23.3634) -> (0, 0) projected
  line L2 (-12, -3.1236) -> (-12, -20.2398) projected
  point P0 (-5.375, -2.6817)
  point P1 (-5.375, -20.6817)
  point P2 (-5.375, -11.6817)
  dimension "d42" = 18
  dimension "d43" = 5.375
  dimension "d44" = 25.925
  dimension "d45" = 9
  dimension "d46" = 12.9625
hole "Otwór2" at (-5.375, 140, 2.6817) at (-5.375, 140, 20.6817) direction (0, -1, 0) diameter 2.4 depth 3 tip angle 118 clearance for "Śruba ze łbem płaskim obrobiona" size "M2" standard "ANSI Profil metryczny M"
sketch "Szkic4" plane through (0, 140, 0) normal (0, 1, 0) x (1, 0, 0)
  line L0 (-7.375, -4.6817) -> (-3.375, -4.6817)
  line L1 (-3.375, -4.6817) -> (-3.375, -18.6817)
  line L2 (-3.375, -18.6817) -> (-7.375, -18.6817)
  line L3 (-7.375, -18.6817) -> (-7.375, -4.6817)
  circle A0 centre (-5.375, -2.6817) radius 1.2 projected
  circle A1 centre (-5.375, -20.6817) radius 1.2 projected
  line L4 (0, -23.3634) -> (0, 0) projected
  line L5 (-12, -3.1236) -> (-12, -20.2398) projected
  point P0 (0, 0)
  dimension "d54" = 14
  dimension "d55" = 4
  dimension "d56" = 18
  dimension "d57" = 2
  dimension "d59" = 2
extrude "Wyciągnięcie proste2" cut sketch "Szkic4" against normal blind 10 contours L0 L1 L2 L3
equation "\"d0\" = d27"
equation "\"d1\" = d0"
equation "\"d2\" = d1"
equation "\"d3\" = d0"
equation "\"d4\" = d1"
equation "\"d5\" = d2"
equation "\"d6\" = d5"
equation "\"d7\" = d5"
equation "\"d8\" = d28"
equation "\"d9\" = d8"
equation "\"d10\" = d8"
equation "\"d11\" = d9"
equation "\"d12\" = d8"
equation "\"d13\" = d9"
equation "\"d14\" = d11"
equation "\"d15\" = d10"
equation "\"d16\" = d29"
equation "\"d17\" = d16"
equation "\"d20\" = d18"
equation "\"d23\" = d19"
equation "\"d25\" = 0.5 * d24"
equation "\"d63\" = 0.5 * d62"
equation "\"d45\" = 0.5 * d42"
equation "\"d46\" = 0.5 * d44"
equation "\"d27\" = 0.5"
equation "\"d28\" = 2.5"
equation "\"d29\" = 4"
properties part number "Realsens_basic"
